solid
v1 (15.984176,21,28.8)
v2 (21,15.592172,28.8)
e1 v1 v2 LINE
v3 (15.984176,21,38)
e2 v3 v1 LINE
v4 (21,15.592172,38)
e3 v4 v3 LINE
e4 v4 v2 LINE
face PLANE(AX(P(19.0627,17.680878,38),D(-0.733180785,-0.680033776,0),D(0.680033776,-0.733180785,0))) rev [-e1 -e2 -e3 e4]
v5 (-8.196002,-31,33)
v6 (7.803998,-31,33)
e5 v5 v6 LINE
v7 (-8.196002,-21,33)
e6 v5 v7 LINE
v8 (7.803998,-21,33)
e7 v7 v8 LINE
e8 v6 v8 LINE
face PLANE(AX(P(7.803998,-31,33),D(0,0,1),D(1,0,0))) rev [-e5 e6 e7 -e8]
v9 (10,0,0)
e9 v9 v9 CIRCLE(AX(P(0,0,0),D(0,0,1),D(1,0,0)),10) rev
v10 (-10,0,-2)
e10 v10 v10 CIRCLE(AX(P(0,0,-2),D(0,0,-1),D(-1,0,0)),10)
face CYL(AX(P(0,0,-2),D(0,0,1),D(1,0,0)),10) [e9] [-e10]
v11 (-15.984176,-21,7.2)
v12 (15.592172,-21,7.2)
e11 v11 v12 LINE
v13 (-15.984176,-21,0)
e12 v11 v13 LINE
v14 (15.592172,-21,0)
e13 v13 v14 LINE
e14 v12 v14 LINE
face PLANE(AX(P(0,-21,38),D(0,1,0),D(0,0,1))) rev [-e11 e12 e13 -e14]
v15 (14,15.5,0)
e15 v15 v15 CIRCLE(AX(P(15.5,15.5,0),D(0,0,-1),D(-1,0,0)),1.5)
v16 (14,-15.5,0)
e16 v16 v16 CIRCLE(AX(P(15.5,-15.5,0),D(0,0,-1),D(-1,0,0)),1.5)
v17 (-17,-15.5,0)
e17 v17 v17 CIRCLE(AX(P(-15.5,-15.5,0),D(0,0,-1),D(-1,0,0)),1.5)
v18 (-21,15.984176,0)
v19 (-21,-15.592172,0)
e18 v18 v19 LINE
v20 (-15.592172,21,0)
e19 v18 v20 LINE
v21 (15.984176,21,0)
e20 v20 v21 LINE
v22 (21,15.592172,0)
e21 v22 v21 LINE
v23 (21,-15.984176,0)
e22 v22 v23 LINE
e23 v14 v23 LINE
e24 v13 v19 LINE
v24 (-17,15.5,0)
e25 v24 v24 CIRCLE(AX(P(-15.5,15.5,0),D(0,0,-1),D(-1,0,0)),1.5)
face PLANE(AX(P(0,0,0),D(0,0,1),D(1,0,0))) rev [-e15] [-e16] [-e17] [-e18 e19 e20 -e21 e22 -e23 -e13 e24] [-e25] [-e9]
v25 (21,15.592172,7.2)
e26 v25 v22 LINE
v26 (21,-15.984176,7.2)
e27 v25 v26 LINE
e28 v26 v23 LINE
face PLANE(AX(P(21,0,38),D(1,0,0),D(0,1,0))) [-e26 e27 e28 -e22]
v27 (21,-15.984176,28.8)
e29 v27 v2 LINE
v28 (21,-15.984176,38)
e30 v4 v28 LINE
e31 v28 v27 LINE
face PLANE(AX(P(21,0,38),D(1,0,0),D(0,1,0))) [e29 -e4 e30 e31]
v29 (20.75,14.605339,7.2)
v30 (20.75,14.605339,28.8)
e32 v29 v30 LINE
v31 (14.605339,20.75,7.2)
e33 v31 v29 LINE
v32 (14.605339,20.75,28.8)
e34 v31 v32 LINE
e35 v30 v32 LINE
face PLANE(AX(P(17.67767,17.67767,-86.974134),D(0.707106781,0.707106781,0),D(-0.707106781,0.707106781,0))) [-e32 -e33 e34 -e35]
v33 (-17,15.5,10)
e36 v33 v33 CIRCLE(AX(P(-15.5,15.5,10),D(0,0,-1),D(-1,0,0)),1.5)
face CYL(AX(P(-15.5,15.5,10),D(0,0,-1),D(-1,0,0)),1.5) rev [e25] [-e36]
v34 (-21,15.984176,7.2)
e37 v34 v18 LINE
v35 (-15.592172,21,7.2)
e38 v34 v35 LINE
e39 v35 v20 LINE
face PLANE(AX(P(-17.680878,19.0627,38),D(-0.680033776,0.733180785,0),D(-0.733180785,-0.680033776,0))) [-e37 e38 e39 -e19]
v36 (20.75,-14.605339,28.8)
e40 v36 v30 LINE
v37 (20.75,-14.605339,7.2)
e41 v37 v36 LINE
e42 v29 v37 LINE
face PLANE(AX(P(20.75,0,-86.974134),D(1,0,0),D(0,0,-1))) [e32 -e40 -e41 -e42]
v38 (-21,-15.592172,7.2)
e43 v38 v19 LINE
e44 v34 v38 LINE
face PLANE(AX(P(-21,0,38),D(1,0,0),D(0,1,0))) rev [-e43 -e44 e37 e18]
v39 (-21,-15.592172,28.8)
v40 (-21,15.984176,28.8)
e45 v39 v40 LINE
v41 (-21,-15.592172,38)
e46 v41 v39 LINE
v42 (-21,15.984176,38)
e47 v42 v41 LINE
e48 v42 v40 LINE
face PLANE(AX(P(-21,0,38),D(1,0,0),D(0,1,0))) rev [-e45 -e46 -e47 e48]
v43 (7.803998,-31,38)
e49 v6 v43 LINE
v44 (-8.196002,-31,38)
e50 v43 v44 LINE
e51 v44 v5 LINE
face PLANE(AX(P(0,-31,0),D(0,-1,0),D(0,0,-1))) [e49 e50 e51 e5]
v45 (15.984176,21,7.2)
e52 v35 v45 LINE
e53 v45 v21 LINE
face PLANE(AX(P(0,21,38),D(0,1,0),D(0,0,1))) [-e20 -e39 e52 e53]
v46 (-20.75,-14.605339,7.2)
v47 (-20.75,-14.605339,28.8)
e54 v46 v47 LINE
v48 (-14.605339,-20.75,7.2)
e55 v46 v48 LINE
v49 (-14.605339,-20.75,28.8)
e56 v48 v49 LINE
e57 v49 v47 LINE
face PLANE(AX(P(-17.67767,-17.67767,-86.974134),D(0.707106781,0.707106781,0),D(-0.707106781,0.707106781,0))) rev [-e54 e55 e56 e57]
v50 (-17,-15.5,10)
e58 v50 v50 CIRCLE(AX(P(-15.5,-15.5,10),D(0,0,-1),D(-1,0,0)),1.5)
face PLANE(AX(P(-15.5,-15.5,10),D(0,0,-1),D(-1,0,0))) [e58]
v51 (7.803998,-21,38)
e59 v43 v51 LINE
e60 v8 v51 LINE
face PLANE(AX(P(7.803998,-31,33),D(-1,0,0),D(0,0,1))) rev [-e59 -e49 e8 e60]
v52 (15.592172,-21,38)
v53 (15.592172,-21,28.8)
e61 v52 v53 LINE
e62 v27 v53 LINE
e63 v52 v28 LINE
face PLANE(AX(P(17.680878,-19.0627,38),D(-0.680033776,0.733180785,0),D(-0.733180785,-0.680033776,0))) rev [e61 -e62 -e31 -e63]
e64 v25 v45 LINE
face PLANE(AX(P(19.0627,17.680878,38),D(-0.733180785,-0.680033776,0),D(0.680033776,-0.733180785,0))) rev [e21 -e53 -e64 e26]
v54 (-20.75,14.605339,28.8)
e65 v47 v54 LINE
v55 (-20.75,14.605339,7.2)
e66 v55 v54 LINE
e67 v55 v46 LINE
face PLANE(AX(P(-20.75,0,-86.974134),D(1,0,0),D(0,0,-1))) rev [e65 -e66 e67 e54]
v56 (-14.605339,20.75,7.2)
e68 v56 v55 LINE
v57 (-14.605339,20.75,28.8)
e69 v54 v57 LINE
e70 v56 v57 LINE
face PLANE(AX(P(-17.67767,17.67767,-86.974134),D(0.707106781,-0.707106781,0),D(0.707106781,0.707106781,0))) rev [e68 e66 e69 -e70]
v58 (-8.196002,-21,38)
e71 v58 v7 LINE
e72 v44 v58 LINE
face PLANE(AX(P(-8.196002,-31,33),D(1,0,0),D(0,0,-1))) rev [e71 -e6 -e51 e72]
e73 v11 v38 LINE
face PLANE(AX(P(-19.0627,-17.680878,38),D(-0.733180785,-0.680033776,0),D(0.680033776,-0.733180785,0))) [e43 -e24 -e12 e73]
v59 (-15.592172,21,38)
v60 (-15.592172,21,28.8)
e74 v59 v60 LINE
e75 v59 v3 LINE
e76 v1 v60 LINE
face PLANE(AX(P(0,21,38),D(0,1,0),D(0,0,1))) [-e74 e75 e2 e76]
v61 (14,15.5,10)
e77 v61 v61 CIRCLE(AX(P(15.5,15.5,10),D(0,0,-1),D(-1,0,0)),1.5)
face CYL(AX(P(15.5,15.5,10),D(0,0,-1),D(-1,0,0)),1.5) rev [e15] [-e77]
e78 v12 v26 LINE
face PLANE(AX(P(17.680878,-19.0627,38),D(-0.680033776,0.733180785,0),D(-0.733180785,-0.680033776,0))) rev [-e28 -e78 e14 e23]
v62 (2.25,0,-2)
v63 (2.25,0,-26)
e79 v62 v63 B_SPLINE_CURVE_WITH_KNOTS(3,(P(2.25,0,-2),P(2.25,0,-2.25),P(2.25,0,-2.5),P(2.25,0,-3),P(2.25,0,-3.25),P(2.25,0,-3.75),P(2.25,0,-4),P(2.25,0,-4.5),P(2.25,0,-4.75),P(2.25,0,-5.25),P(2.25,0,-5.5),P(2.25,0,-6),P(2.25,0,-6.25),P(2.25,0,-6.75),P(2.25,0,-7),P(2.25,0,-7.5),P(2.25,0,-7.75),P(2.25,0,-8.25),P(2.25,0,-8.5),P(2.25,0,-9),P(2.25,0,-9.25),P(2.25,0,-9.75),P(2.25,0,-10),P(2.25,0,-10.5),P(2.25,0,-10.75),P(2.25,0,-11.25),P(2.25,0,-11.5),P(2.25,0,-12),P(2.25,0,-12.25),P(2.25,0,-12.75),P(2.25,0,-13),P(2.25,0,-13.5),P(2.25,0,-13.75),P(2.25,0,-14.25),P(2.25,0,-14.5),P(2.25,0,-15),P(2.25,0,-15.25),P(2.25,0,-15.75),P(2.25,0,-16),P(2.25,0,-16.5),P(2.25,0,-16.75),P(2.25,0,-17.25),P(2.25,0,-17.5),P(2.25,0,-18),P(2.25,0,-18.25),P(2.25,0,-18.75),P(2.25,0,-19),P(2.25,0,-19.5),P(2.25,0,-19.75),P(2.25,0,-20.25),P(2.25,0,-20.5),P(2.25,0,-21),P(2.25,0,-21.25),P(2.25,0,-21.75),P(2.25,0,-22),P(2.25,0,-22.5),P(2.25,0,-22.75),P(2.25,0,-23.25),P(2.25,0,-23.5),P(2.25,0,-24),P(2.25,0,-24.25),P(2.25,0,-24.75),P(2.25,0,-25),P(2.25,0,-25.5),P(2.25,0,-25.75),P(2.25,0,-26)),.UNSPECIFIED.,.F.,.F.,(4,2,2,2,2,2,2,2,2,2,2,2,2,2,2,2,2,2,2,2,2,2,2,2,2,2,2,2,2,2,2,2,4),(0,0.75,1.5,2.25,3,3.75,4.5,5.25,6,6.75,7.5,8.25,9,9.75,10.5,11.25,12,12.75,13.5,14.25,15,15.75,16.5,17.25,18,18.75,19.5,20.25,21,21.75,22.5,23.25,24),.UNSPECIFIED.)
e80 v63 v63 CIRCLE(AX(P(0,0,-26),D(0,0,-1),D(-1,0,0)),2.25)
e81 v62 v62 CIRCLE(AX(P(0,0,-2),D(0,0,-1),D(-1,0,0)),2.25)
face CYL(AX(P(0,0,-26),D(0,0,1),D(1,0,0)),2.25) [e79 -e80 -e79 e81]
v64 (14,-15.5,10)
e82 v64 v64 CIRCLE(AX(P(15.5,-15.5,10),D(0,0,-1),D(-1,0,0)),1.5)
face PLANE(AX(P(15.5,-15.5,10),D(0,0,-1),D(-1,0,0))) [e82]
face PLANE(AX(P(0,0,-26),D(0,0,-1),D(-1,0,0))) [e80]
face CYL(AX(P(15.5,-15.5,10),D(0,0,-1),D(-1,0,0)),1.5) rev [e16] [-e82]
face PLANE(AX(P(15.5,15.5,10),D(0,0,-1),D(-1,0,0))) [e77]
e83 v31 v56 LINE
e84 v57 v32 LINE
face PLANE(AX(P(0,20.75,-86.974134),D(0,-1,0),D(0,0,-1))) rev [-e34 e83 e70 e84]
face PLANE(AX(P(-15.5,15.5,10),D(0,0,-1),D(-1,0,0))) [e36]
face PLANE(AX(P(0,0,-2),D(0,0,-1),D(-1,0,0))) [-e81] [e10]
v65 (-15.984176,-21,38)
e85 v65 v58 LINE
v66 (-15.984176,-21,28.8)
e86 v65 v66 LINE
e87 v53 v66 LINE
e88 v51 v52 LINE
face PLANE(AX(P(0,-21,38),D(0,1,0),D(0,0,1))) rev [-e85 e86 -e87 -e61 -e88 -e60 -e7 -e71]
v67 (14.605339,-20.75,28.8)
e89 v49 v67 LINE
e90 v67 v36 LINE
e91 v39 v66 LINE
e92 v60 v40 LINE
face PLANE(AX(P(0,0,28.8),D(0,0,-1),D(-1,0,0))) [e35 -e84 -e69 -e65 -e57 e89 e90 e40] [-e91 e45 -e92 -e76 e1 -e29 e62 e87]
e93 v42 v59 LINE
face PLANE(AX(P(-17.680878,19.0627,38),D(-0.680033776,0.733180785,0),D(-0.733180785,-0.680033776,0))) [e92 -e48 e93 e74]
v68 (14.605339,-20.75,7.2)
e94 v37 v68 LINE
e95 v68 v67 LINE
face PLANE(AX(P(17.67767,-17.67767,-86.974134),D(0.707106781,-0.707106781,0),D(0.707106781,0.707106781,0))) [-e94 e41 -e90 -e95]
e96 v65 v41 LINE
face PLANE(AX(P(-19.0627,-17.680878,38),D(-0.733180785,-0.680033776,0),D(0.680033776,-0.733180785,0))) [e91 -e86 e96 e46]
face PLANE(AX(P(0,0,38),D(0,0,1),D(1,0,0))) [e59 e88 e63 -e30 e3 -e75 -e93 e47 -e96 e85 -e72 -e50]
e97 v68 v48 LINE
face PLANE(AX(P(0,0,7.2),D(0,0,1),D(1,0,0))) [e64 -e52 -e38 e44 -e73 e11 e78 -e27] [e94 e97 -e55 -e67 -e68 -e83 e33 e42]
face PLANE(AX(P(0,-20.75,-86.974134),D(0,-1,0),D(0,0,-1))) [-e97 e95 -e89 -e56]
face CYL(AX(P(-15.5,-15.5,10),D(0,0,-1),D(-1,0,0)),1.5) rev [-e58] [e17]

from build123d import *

# Parameters (mm, degrees)
RESSALTO_EXTRUS_O1_DEPTH   = 38
CORTE_EXTRUS_O_FINA1_START = -30.8
CORTE_EXTRUS_O_FINA1_DEPTH = 21.6
ESBO_O3_R                  = 2.25
RESSALTO_EXTRUS_O2_DEPTH   = 26
ESBO_O4_R                  = 10
RESSALTO_EXTRUS_O3_DEPTH   = 2
ESBO_O5_R                  = 1.5
CORTE_EXTRUS_O1_DEPTH      = 10
ESBO_O7_W                  = 16
ESBO_O7_H                  = 5
RESSALTO_EXTRUS_O4_DEPTH   = 10


# Read off the part's stored shape, not the designer's step: Corte-Extrusão-Fina1
with BuildPart() as part:
    # Esboço1 → Ressalto-extrusão1 (new body)
    with BuildSketch(Plane.XY):
        Polygon((-21, -15.592171873), (-15.984175996, -21), (15.592171873, -21), (21, -15.984175996), (21, 15.592171873), (15.984175996, 21), (-15.592171873, 21), (-21, 15.984175996), align=None)
    extrude(amount=RESSALTO_EXTRUS_O1_DEPTH)

    # Corte-Extrusão-Fina1 outline → Corte-Extrusão-Fina1 (cut)
    with BuildSketch(Plane.XY.offset(38).offset(CORTE_EXTRUS_O_FINA1_START)):
        Polygon((15.592171873, -21), (21, -15.984175996), (21, 15.592171873), (15.984175996, 21), (-15.592171873, 21), (-21, 15.984175996), (-21, -15.592171873), (-15.984175996, -21), align=None)
        Polygon((14.605339059, 20.75), (20.75, 14.605339059), (20.75, -14.605339059), (14.605339059, -20.75), (-14.605339059, -20.75), (-20.75, -14.605339059), (-20.75, 14.605339059), (-14.605339059, 20.75), align=None, mode=Mode.SUBTRACT)
    extrude(amount=CORTE_EXTRUS_O_FINA1_DEPTH, mode=Mode.SUBTRACT)

    # Esboço3 → Ressalto-extrusão2 (add)
    with BuildSketch(Plane(origin=(0, 0, 0), x_dir=(-1, 0, 0), z_dir=(0, 0, -1))):
        with Locations(Location((0, 0, 0), (0, 0, 180))):
            Circle(ESBO_O3_R)
    extrude(amount=RESSALTO_EXTRUS_O2_DEPTH)

    # Esboço4 → Ressalto-extrusão3 (add)
    with BuildSketch(Plane(origin=(0, 0, 0), x_dir=(-1, 0, 0), z_dir=(0, 0, -1))):
        with Locations(Location((0, 0, 0), (0, 0, 180))):
            Circle(ESBO_O4_R)
    extrude(amount=RESSALTO_EXTRUS_O3_DEPTH)

    # Esboço5 → Corte-extrusão1 (cut)
    with BuildSketch(Plane(origin=(0, 0, 0), x_dir=(-1, 0, 0), z_dir=(0, 0, -1))):
        with Locations((15.5, -15.5)):
            Circle(ESBO_O5_R)
        with Locations((-15.5, -15.5)):
            Circle(ESBO_O5_R)
        with Locations((-15.5, 15.5)):
            Circle(ESBO_O5_R)
        with Locations((15.5, 15.5)):
            Circle(ESBO_O5_R)
    extrude(amount=-CORTE_EXTRUS_O1_DEPTH, mode=Mode.SUBTRACT)

    # Esboço7 → Ressalto-extrusão4 (add)
    with BuildSketch(Plane.XZ.offset(21)):
        with Locations((-0.196002062, 35.5)):
            Rectangle(ESBO_O7_W, ESBO_O7_H)
    extrude(amount=RESSALTO_EXTRUS_O4_DEPTH)


solid = part.part
